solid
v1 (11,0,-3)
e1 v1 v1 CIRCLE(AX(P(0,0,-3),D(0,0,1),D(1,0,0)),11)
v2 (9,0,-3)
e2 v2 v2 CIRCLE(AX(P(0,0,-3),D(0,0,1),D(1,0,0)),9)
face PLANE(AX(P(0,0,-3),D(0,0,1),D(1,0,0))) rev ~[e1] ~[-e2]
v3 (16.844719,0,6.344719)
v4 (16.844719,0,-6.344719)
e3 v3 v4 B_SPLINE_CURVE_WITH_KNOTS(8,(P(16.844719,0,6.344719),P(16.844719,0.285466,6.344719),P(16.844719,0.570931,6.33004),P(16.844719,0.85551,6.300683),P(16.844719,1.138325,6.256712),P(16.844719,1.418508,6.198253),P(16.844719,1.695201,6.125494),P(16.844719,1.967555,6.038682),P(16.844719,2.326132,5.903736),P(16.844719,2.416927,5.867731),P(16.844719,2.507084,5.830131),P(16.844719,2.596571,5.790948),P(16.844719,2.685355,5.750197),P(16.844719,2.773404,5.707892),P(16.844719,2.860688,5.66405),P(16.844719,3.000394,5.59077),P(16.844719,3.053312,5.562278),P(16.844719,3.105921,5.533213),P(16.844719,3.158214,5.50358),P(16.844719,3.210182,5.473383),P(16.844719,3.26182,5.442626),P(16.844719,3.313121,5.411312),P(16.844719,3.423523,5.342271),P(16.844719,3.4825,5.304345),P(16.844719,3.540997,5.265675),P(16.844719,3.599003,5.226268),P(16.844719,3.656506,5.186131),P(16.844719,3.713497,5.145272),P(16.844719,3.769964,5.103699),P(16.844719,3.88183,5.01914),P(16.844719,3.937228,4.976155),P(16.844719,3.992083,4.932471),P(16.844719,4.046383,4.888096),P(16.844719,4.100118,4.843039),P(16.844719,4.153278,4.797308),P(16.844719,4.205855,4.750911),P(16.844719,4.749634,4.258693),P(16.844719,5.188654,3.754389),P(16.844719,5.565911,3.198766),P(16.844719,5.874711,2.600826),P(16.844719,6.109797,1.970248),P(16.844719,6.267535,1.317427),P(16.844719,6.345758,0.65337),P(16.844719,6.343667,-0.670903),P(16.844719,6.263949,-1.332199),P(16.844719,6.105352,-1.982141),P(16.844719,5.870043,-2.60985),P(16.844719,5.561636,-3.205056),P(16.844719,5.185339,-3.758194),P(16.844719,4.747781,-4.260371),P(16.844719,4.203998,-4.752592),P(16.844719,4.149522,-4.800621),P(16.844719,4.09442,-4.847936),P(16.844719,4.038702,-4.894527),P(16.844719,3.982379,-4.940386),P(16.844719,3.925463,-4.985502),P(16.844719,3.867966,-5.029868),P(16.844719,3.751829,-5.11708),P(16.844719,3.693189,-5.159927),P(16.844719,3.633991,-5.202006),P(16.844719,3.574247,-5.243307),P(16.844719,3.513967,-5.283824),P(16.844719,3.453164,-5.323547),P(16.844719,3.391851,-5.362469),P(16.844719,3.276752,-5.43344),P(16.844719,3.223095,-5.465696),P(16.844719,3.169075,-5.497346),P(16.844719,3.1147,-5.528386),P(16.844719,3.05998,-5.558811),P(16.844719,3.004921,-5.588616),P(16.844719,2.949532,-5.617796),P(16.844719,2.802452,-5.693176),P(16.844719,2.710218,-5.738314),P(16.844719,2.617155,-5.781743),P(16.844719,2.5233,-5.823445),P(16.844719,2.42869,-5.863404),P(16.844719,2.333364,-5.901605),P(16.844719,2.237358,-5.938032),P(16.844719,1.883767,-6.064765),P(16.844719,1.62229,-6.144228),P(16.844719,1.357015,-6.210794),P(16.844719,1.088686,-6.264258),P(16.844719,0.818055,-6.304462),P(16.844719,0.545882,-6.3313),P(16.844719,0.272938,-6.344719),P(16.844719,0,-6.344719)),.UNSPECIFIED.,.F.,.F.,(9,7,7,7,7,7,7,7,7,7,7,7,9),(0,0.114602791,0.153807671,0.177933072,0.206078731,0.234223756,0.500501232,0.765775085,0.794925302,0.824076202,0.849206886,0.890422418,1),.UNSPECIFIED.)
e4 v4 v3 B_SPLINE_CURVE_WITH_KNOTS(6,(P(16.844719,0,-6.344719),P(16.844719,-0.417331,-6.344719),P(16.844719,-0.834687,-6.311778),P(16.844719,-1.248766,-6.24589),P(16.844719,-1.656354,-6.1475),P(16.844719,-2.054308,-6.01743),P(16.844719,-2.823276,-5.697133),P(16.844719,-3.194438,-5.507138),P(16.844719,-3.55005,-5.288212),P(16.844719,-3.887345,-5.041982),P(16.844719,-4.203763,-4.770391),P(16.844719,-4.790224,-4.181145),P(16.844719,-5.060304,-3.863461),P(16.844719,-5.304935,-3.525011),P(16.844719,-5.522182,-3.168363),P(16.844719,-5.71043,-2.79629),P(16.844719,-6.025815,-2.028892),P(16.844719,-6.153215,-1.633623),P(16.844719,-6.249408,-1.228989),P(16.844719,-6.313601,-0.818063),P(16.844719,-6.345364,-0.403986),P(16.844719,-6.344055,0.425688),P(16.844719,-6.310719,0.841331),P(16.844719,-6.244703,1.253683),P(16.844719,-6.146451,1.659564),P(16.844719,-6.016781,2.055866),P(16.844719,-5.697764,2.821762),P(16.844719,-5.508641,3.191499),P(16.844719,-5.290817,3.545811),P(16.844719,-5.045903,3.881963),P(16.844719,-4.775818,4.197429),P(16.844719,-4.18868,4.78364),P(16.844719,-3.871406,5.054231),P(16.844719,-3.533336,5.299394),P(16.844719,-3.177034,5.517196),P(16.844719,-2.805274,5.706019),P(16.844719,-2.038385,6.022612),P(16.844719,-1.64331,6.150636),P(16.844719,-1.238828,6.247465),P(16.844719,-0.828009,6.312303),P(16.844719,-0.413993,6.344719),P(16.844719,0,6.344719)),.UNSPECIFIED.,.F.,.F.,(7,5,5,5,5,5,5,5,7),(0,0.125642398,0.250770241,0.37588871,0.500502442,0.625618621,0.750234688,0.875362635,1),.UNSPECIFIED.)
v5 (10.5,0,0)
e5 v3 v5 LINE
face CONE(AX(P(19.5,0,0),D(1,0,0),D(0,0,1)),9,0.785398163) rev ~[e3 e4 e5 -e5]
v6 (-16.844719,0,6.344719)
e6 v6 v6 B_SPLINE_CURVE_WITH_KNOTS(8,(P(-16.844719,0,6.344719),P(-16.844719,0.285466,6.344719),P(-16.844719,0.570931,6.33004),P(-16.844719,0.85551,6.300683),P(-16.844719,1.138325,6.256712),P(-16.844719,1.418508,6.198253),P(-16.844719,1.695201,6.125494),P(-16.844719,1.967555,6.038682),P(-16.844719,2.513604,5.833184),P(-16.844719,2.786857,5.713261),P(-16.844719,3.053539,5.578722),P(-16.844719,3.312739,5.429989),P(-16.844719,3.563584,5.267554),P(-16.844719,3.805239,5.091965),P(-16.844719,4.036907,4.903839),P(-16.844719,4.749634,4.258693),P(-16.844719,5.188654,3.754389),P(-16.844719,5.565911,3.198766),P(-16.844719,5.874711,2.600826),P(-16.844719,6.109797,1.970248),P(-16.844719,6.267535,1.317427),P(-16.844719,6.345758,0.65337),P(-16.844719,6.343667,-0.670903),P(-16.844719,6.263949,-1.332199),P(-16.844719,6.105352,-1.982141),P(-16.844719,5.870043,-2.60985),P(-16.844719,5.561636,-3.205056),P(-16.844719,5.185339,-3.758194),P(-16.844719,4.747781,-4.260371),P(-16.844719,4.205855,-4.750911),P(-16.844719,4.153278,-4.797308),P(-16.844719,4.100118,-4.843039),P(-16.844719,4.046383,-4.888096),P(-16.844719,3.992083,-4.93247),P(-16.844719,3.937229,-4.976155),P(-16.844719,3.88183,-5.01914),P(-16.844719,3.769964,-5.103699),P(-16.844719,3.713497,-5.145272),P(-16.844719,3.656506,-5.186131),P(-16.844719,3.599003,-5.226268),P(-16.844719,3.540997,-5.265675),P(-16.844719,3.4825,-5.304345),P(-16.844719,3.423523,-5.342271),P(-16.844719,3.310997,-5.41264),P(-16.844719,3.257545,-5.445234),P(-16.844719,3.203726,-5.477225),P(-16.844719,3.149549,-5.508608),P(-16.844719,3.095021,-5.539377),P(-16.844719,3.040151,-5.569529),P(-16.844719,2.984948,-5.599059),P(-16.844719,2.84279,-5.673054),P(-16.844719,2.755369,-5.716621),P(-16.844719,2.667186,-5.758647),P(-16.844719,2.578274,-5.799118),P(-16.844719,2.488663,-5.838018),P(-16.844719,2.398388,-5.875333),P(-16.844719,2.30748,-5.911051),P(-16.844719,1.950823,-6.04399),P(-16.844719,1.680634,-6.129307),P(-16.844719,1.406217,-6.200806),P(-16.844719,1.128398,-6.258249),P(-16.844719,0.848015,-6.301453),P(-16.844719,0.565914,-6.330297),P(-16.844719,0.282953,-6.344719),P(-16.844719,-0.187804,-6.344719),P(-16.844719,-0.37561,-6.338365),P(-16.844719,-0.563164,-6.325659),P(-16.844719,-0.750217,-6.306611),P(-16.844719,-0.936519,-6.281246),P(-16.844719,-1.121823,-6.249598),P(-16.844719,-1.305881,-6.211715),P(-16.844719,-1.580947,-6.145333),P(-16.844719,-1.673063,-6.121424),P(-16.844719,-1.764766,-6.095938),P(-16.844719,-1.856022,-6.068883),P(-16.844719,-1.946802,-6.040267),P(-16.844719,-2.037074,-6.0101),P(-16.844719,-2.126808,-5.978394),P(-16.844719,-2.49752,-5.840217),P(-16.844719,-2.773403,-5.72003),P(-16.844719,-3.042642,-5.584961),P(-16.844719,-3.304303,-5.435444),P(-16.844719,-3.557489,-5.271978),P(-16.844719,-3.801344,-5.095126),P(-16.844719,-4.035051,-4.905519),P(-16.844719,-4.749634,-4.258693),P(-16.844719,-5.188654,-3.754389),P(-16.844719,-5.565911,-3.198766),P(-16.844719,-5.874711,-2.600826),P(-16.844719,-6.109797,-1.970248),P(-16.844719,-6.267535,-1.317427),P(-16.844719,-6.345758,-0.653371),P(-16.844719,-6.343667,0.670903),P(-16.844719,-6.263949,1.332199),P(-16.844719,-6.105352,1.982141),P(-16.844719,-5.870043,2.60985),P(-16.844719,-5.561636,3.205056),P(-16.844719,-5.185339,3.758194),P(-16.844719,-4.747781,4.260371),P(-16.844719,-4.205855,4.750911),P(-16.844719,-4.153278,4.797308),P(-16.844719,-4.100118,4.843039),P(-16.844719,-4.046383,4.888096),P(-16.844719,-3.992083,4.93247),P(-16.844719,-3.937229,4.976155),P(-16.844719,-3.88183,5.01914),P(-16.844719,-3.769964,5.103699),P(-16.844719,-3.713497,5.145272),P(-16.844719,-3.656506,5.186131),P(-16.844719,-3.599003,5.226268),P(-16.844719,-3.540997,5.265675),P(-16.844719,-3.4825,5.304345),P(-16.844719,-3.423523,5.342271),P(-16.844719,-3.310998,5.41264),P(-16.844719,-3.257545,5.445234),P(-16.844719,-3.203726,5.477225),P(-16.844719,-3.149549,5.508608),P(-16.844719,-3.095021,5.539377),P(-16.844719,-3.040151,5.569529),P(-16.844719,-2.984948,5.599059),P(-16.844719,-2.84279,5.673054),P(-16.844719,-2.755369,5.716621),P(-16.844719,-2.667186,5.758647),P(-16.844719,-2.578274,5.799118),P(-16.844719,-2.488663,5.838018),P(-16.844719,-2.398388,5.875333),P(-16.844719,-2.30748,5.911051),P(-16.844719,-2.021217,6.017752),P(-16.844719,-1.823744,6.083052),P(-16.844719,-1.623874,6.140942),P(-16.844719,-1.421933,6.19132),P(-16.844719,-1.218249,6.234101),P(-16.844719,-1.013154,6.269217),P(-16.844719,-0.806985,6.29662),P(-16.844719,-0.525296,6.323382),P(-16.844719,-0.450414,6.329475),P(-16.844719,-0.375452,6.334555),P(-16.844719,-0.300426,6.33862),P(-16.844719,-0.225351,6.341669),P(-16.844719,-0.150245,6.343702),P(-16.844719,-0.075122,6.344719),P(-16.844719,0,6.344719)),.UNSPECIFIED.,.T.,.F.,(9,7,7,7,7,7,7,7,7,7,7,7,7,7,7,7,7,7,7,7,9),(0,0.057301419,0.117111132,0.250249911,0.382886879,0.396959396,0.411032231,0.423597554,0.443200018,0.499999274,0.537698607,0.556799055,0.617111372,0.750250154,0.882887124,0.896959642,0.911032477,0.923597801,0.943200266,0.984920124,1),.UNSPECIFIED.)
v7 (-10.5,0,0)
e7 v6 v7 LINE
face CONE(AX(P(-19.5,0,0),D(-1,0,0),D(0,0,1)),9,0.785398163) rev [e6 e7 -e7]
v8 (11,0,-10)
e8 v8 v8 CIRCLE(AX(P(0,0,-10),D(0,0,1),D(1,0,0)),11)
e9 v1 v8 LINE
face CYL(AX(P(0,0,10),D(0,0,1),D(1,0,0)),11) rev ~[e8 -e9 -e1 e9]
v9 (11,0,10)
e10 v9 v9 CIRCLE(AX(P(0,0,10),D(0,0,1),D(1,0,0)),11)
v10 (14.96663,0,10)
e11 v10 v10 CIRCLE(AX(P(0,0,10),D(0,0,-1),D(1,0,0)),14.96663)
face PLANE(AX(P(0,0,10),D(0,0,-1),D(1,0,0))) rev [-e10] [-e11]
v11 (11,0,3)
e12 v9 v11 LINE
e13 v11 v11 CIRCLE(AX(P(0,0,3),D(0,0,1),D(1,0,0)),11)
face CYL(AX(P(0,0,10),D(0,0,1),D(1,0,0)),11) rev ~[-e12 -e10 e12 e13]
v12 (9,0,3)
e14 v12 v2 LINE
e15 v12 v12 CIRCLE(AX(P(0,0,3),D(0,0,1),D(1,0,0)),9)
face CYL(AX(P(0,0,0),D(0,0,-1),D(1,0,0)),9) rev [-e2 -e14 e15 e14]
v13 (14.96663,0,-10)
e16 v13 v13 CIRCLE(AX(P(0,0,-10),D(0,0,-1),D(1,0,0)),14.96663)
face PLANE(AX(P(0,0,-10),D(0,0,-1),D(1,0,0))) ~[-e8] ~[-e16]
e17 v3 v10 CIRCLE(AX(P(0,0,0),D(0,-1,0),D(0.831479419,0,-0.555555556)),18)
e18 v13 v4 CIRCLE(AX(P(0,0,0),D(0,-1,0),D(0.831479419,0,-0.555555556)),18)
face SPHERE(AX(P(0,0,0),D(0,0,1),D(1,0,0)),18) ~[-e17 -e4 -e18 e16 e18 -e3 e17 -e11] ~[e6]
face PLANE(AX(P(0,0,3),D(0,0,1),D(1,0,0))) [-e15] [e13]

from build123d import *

# Parameters (mm, degrees)
F0_W     = 14.9666295471
F0_H     = 20
F4_R     = 11
F5_DEPTH = 20.001
F6_R     = 12
F6_R_2   = 9
F7_DEPTH = 3


# Not quite as in the source:
# - a pattern or mirror of a feature is missing from the dataset's text; its kind, count and spacing are read off the source's solid


with BuildPart() as f1:
    # F0 (on Front) → F1 (revolve)
    with BuildSketch(Plane.XZ):
        with Locations((7.4833147735, 0)):
            Rectangle(F0_W, F0_H)
        with BuildLine():
            ThreePointArc((14.9666295471, -10), (18, 0), (14.9666295471, 10))
            Line((14.9666295471, 10), (14.9666295471, -10))
        make_face()
    revolve(axis=Axis((0, 0, 0), (0, 0, -1)))

    # F2 (on Top) → F3 (revolve, cut)
    with BuildSketch(Plane.XY):
        Polygon((39.5, 9), (30.5, 0), (39.5, 0), align=None)
    revolve(axis=Axis((35, 0, 0), (-1, 0, 0)), mode=Mode.SUBTRACT)

    # F4 (on face) → F5 (cut, through all)
    with BuildSketch(Plane.XY.offset(10)):
        Circle(F4_R)
    extrude(amount=-F5_DEPTH, mode=Mode.SUBTRACT)

    # F6 (on Top) → F7 (join, symmetric)
    with BuildSketch(Plane.XY):
        Circle(F6_R)
        Circle(F6_R_2, mode=Mode.SUBTRACT)
    extrude(amount=F7_DEPTH, both=True)

    # F8 (on Front) → F9 (revolve, cut)
    with BuildSketch(Plane.XZ):
        Polygon((19.5, 9), (10.5, 0), (19.5, 0), align=None)
    f9 = revolve(axis=Axis((15, 0, 0), (-1, 0, 0)), mode=Mode.SUBTRACT)

    # F9_copies: F9 across plane
    add(f9.mirror(Plane(origin=(0, 0, 0), x_dir=(0, 0, -1), z_dir=(-1, 0, 0))), mode=Mode.SUBTRACT)


solid = f1.part
